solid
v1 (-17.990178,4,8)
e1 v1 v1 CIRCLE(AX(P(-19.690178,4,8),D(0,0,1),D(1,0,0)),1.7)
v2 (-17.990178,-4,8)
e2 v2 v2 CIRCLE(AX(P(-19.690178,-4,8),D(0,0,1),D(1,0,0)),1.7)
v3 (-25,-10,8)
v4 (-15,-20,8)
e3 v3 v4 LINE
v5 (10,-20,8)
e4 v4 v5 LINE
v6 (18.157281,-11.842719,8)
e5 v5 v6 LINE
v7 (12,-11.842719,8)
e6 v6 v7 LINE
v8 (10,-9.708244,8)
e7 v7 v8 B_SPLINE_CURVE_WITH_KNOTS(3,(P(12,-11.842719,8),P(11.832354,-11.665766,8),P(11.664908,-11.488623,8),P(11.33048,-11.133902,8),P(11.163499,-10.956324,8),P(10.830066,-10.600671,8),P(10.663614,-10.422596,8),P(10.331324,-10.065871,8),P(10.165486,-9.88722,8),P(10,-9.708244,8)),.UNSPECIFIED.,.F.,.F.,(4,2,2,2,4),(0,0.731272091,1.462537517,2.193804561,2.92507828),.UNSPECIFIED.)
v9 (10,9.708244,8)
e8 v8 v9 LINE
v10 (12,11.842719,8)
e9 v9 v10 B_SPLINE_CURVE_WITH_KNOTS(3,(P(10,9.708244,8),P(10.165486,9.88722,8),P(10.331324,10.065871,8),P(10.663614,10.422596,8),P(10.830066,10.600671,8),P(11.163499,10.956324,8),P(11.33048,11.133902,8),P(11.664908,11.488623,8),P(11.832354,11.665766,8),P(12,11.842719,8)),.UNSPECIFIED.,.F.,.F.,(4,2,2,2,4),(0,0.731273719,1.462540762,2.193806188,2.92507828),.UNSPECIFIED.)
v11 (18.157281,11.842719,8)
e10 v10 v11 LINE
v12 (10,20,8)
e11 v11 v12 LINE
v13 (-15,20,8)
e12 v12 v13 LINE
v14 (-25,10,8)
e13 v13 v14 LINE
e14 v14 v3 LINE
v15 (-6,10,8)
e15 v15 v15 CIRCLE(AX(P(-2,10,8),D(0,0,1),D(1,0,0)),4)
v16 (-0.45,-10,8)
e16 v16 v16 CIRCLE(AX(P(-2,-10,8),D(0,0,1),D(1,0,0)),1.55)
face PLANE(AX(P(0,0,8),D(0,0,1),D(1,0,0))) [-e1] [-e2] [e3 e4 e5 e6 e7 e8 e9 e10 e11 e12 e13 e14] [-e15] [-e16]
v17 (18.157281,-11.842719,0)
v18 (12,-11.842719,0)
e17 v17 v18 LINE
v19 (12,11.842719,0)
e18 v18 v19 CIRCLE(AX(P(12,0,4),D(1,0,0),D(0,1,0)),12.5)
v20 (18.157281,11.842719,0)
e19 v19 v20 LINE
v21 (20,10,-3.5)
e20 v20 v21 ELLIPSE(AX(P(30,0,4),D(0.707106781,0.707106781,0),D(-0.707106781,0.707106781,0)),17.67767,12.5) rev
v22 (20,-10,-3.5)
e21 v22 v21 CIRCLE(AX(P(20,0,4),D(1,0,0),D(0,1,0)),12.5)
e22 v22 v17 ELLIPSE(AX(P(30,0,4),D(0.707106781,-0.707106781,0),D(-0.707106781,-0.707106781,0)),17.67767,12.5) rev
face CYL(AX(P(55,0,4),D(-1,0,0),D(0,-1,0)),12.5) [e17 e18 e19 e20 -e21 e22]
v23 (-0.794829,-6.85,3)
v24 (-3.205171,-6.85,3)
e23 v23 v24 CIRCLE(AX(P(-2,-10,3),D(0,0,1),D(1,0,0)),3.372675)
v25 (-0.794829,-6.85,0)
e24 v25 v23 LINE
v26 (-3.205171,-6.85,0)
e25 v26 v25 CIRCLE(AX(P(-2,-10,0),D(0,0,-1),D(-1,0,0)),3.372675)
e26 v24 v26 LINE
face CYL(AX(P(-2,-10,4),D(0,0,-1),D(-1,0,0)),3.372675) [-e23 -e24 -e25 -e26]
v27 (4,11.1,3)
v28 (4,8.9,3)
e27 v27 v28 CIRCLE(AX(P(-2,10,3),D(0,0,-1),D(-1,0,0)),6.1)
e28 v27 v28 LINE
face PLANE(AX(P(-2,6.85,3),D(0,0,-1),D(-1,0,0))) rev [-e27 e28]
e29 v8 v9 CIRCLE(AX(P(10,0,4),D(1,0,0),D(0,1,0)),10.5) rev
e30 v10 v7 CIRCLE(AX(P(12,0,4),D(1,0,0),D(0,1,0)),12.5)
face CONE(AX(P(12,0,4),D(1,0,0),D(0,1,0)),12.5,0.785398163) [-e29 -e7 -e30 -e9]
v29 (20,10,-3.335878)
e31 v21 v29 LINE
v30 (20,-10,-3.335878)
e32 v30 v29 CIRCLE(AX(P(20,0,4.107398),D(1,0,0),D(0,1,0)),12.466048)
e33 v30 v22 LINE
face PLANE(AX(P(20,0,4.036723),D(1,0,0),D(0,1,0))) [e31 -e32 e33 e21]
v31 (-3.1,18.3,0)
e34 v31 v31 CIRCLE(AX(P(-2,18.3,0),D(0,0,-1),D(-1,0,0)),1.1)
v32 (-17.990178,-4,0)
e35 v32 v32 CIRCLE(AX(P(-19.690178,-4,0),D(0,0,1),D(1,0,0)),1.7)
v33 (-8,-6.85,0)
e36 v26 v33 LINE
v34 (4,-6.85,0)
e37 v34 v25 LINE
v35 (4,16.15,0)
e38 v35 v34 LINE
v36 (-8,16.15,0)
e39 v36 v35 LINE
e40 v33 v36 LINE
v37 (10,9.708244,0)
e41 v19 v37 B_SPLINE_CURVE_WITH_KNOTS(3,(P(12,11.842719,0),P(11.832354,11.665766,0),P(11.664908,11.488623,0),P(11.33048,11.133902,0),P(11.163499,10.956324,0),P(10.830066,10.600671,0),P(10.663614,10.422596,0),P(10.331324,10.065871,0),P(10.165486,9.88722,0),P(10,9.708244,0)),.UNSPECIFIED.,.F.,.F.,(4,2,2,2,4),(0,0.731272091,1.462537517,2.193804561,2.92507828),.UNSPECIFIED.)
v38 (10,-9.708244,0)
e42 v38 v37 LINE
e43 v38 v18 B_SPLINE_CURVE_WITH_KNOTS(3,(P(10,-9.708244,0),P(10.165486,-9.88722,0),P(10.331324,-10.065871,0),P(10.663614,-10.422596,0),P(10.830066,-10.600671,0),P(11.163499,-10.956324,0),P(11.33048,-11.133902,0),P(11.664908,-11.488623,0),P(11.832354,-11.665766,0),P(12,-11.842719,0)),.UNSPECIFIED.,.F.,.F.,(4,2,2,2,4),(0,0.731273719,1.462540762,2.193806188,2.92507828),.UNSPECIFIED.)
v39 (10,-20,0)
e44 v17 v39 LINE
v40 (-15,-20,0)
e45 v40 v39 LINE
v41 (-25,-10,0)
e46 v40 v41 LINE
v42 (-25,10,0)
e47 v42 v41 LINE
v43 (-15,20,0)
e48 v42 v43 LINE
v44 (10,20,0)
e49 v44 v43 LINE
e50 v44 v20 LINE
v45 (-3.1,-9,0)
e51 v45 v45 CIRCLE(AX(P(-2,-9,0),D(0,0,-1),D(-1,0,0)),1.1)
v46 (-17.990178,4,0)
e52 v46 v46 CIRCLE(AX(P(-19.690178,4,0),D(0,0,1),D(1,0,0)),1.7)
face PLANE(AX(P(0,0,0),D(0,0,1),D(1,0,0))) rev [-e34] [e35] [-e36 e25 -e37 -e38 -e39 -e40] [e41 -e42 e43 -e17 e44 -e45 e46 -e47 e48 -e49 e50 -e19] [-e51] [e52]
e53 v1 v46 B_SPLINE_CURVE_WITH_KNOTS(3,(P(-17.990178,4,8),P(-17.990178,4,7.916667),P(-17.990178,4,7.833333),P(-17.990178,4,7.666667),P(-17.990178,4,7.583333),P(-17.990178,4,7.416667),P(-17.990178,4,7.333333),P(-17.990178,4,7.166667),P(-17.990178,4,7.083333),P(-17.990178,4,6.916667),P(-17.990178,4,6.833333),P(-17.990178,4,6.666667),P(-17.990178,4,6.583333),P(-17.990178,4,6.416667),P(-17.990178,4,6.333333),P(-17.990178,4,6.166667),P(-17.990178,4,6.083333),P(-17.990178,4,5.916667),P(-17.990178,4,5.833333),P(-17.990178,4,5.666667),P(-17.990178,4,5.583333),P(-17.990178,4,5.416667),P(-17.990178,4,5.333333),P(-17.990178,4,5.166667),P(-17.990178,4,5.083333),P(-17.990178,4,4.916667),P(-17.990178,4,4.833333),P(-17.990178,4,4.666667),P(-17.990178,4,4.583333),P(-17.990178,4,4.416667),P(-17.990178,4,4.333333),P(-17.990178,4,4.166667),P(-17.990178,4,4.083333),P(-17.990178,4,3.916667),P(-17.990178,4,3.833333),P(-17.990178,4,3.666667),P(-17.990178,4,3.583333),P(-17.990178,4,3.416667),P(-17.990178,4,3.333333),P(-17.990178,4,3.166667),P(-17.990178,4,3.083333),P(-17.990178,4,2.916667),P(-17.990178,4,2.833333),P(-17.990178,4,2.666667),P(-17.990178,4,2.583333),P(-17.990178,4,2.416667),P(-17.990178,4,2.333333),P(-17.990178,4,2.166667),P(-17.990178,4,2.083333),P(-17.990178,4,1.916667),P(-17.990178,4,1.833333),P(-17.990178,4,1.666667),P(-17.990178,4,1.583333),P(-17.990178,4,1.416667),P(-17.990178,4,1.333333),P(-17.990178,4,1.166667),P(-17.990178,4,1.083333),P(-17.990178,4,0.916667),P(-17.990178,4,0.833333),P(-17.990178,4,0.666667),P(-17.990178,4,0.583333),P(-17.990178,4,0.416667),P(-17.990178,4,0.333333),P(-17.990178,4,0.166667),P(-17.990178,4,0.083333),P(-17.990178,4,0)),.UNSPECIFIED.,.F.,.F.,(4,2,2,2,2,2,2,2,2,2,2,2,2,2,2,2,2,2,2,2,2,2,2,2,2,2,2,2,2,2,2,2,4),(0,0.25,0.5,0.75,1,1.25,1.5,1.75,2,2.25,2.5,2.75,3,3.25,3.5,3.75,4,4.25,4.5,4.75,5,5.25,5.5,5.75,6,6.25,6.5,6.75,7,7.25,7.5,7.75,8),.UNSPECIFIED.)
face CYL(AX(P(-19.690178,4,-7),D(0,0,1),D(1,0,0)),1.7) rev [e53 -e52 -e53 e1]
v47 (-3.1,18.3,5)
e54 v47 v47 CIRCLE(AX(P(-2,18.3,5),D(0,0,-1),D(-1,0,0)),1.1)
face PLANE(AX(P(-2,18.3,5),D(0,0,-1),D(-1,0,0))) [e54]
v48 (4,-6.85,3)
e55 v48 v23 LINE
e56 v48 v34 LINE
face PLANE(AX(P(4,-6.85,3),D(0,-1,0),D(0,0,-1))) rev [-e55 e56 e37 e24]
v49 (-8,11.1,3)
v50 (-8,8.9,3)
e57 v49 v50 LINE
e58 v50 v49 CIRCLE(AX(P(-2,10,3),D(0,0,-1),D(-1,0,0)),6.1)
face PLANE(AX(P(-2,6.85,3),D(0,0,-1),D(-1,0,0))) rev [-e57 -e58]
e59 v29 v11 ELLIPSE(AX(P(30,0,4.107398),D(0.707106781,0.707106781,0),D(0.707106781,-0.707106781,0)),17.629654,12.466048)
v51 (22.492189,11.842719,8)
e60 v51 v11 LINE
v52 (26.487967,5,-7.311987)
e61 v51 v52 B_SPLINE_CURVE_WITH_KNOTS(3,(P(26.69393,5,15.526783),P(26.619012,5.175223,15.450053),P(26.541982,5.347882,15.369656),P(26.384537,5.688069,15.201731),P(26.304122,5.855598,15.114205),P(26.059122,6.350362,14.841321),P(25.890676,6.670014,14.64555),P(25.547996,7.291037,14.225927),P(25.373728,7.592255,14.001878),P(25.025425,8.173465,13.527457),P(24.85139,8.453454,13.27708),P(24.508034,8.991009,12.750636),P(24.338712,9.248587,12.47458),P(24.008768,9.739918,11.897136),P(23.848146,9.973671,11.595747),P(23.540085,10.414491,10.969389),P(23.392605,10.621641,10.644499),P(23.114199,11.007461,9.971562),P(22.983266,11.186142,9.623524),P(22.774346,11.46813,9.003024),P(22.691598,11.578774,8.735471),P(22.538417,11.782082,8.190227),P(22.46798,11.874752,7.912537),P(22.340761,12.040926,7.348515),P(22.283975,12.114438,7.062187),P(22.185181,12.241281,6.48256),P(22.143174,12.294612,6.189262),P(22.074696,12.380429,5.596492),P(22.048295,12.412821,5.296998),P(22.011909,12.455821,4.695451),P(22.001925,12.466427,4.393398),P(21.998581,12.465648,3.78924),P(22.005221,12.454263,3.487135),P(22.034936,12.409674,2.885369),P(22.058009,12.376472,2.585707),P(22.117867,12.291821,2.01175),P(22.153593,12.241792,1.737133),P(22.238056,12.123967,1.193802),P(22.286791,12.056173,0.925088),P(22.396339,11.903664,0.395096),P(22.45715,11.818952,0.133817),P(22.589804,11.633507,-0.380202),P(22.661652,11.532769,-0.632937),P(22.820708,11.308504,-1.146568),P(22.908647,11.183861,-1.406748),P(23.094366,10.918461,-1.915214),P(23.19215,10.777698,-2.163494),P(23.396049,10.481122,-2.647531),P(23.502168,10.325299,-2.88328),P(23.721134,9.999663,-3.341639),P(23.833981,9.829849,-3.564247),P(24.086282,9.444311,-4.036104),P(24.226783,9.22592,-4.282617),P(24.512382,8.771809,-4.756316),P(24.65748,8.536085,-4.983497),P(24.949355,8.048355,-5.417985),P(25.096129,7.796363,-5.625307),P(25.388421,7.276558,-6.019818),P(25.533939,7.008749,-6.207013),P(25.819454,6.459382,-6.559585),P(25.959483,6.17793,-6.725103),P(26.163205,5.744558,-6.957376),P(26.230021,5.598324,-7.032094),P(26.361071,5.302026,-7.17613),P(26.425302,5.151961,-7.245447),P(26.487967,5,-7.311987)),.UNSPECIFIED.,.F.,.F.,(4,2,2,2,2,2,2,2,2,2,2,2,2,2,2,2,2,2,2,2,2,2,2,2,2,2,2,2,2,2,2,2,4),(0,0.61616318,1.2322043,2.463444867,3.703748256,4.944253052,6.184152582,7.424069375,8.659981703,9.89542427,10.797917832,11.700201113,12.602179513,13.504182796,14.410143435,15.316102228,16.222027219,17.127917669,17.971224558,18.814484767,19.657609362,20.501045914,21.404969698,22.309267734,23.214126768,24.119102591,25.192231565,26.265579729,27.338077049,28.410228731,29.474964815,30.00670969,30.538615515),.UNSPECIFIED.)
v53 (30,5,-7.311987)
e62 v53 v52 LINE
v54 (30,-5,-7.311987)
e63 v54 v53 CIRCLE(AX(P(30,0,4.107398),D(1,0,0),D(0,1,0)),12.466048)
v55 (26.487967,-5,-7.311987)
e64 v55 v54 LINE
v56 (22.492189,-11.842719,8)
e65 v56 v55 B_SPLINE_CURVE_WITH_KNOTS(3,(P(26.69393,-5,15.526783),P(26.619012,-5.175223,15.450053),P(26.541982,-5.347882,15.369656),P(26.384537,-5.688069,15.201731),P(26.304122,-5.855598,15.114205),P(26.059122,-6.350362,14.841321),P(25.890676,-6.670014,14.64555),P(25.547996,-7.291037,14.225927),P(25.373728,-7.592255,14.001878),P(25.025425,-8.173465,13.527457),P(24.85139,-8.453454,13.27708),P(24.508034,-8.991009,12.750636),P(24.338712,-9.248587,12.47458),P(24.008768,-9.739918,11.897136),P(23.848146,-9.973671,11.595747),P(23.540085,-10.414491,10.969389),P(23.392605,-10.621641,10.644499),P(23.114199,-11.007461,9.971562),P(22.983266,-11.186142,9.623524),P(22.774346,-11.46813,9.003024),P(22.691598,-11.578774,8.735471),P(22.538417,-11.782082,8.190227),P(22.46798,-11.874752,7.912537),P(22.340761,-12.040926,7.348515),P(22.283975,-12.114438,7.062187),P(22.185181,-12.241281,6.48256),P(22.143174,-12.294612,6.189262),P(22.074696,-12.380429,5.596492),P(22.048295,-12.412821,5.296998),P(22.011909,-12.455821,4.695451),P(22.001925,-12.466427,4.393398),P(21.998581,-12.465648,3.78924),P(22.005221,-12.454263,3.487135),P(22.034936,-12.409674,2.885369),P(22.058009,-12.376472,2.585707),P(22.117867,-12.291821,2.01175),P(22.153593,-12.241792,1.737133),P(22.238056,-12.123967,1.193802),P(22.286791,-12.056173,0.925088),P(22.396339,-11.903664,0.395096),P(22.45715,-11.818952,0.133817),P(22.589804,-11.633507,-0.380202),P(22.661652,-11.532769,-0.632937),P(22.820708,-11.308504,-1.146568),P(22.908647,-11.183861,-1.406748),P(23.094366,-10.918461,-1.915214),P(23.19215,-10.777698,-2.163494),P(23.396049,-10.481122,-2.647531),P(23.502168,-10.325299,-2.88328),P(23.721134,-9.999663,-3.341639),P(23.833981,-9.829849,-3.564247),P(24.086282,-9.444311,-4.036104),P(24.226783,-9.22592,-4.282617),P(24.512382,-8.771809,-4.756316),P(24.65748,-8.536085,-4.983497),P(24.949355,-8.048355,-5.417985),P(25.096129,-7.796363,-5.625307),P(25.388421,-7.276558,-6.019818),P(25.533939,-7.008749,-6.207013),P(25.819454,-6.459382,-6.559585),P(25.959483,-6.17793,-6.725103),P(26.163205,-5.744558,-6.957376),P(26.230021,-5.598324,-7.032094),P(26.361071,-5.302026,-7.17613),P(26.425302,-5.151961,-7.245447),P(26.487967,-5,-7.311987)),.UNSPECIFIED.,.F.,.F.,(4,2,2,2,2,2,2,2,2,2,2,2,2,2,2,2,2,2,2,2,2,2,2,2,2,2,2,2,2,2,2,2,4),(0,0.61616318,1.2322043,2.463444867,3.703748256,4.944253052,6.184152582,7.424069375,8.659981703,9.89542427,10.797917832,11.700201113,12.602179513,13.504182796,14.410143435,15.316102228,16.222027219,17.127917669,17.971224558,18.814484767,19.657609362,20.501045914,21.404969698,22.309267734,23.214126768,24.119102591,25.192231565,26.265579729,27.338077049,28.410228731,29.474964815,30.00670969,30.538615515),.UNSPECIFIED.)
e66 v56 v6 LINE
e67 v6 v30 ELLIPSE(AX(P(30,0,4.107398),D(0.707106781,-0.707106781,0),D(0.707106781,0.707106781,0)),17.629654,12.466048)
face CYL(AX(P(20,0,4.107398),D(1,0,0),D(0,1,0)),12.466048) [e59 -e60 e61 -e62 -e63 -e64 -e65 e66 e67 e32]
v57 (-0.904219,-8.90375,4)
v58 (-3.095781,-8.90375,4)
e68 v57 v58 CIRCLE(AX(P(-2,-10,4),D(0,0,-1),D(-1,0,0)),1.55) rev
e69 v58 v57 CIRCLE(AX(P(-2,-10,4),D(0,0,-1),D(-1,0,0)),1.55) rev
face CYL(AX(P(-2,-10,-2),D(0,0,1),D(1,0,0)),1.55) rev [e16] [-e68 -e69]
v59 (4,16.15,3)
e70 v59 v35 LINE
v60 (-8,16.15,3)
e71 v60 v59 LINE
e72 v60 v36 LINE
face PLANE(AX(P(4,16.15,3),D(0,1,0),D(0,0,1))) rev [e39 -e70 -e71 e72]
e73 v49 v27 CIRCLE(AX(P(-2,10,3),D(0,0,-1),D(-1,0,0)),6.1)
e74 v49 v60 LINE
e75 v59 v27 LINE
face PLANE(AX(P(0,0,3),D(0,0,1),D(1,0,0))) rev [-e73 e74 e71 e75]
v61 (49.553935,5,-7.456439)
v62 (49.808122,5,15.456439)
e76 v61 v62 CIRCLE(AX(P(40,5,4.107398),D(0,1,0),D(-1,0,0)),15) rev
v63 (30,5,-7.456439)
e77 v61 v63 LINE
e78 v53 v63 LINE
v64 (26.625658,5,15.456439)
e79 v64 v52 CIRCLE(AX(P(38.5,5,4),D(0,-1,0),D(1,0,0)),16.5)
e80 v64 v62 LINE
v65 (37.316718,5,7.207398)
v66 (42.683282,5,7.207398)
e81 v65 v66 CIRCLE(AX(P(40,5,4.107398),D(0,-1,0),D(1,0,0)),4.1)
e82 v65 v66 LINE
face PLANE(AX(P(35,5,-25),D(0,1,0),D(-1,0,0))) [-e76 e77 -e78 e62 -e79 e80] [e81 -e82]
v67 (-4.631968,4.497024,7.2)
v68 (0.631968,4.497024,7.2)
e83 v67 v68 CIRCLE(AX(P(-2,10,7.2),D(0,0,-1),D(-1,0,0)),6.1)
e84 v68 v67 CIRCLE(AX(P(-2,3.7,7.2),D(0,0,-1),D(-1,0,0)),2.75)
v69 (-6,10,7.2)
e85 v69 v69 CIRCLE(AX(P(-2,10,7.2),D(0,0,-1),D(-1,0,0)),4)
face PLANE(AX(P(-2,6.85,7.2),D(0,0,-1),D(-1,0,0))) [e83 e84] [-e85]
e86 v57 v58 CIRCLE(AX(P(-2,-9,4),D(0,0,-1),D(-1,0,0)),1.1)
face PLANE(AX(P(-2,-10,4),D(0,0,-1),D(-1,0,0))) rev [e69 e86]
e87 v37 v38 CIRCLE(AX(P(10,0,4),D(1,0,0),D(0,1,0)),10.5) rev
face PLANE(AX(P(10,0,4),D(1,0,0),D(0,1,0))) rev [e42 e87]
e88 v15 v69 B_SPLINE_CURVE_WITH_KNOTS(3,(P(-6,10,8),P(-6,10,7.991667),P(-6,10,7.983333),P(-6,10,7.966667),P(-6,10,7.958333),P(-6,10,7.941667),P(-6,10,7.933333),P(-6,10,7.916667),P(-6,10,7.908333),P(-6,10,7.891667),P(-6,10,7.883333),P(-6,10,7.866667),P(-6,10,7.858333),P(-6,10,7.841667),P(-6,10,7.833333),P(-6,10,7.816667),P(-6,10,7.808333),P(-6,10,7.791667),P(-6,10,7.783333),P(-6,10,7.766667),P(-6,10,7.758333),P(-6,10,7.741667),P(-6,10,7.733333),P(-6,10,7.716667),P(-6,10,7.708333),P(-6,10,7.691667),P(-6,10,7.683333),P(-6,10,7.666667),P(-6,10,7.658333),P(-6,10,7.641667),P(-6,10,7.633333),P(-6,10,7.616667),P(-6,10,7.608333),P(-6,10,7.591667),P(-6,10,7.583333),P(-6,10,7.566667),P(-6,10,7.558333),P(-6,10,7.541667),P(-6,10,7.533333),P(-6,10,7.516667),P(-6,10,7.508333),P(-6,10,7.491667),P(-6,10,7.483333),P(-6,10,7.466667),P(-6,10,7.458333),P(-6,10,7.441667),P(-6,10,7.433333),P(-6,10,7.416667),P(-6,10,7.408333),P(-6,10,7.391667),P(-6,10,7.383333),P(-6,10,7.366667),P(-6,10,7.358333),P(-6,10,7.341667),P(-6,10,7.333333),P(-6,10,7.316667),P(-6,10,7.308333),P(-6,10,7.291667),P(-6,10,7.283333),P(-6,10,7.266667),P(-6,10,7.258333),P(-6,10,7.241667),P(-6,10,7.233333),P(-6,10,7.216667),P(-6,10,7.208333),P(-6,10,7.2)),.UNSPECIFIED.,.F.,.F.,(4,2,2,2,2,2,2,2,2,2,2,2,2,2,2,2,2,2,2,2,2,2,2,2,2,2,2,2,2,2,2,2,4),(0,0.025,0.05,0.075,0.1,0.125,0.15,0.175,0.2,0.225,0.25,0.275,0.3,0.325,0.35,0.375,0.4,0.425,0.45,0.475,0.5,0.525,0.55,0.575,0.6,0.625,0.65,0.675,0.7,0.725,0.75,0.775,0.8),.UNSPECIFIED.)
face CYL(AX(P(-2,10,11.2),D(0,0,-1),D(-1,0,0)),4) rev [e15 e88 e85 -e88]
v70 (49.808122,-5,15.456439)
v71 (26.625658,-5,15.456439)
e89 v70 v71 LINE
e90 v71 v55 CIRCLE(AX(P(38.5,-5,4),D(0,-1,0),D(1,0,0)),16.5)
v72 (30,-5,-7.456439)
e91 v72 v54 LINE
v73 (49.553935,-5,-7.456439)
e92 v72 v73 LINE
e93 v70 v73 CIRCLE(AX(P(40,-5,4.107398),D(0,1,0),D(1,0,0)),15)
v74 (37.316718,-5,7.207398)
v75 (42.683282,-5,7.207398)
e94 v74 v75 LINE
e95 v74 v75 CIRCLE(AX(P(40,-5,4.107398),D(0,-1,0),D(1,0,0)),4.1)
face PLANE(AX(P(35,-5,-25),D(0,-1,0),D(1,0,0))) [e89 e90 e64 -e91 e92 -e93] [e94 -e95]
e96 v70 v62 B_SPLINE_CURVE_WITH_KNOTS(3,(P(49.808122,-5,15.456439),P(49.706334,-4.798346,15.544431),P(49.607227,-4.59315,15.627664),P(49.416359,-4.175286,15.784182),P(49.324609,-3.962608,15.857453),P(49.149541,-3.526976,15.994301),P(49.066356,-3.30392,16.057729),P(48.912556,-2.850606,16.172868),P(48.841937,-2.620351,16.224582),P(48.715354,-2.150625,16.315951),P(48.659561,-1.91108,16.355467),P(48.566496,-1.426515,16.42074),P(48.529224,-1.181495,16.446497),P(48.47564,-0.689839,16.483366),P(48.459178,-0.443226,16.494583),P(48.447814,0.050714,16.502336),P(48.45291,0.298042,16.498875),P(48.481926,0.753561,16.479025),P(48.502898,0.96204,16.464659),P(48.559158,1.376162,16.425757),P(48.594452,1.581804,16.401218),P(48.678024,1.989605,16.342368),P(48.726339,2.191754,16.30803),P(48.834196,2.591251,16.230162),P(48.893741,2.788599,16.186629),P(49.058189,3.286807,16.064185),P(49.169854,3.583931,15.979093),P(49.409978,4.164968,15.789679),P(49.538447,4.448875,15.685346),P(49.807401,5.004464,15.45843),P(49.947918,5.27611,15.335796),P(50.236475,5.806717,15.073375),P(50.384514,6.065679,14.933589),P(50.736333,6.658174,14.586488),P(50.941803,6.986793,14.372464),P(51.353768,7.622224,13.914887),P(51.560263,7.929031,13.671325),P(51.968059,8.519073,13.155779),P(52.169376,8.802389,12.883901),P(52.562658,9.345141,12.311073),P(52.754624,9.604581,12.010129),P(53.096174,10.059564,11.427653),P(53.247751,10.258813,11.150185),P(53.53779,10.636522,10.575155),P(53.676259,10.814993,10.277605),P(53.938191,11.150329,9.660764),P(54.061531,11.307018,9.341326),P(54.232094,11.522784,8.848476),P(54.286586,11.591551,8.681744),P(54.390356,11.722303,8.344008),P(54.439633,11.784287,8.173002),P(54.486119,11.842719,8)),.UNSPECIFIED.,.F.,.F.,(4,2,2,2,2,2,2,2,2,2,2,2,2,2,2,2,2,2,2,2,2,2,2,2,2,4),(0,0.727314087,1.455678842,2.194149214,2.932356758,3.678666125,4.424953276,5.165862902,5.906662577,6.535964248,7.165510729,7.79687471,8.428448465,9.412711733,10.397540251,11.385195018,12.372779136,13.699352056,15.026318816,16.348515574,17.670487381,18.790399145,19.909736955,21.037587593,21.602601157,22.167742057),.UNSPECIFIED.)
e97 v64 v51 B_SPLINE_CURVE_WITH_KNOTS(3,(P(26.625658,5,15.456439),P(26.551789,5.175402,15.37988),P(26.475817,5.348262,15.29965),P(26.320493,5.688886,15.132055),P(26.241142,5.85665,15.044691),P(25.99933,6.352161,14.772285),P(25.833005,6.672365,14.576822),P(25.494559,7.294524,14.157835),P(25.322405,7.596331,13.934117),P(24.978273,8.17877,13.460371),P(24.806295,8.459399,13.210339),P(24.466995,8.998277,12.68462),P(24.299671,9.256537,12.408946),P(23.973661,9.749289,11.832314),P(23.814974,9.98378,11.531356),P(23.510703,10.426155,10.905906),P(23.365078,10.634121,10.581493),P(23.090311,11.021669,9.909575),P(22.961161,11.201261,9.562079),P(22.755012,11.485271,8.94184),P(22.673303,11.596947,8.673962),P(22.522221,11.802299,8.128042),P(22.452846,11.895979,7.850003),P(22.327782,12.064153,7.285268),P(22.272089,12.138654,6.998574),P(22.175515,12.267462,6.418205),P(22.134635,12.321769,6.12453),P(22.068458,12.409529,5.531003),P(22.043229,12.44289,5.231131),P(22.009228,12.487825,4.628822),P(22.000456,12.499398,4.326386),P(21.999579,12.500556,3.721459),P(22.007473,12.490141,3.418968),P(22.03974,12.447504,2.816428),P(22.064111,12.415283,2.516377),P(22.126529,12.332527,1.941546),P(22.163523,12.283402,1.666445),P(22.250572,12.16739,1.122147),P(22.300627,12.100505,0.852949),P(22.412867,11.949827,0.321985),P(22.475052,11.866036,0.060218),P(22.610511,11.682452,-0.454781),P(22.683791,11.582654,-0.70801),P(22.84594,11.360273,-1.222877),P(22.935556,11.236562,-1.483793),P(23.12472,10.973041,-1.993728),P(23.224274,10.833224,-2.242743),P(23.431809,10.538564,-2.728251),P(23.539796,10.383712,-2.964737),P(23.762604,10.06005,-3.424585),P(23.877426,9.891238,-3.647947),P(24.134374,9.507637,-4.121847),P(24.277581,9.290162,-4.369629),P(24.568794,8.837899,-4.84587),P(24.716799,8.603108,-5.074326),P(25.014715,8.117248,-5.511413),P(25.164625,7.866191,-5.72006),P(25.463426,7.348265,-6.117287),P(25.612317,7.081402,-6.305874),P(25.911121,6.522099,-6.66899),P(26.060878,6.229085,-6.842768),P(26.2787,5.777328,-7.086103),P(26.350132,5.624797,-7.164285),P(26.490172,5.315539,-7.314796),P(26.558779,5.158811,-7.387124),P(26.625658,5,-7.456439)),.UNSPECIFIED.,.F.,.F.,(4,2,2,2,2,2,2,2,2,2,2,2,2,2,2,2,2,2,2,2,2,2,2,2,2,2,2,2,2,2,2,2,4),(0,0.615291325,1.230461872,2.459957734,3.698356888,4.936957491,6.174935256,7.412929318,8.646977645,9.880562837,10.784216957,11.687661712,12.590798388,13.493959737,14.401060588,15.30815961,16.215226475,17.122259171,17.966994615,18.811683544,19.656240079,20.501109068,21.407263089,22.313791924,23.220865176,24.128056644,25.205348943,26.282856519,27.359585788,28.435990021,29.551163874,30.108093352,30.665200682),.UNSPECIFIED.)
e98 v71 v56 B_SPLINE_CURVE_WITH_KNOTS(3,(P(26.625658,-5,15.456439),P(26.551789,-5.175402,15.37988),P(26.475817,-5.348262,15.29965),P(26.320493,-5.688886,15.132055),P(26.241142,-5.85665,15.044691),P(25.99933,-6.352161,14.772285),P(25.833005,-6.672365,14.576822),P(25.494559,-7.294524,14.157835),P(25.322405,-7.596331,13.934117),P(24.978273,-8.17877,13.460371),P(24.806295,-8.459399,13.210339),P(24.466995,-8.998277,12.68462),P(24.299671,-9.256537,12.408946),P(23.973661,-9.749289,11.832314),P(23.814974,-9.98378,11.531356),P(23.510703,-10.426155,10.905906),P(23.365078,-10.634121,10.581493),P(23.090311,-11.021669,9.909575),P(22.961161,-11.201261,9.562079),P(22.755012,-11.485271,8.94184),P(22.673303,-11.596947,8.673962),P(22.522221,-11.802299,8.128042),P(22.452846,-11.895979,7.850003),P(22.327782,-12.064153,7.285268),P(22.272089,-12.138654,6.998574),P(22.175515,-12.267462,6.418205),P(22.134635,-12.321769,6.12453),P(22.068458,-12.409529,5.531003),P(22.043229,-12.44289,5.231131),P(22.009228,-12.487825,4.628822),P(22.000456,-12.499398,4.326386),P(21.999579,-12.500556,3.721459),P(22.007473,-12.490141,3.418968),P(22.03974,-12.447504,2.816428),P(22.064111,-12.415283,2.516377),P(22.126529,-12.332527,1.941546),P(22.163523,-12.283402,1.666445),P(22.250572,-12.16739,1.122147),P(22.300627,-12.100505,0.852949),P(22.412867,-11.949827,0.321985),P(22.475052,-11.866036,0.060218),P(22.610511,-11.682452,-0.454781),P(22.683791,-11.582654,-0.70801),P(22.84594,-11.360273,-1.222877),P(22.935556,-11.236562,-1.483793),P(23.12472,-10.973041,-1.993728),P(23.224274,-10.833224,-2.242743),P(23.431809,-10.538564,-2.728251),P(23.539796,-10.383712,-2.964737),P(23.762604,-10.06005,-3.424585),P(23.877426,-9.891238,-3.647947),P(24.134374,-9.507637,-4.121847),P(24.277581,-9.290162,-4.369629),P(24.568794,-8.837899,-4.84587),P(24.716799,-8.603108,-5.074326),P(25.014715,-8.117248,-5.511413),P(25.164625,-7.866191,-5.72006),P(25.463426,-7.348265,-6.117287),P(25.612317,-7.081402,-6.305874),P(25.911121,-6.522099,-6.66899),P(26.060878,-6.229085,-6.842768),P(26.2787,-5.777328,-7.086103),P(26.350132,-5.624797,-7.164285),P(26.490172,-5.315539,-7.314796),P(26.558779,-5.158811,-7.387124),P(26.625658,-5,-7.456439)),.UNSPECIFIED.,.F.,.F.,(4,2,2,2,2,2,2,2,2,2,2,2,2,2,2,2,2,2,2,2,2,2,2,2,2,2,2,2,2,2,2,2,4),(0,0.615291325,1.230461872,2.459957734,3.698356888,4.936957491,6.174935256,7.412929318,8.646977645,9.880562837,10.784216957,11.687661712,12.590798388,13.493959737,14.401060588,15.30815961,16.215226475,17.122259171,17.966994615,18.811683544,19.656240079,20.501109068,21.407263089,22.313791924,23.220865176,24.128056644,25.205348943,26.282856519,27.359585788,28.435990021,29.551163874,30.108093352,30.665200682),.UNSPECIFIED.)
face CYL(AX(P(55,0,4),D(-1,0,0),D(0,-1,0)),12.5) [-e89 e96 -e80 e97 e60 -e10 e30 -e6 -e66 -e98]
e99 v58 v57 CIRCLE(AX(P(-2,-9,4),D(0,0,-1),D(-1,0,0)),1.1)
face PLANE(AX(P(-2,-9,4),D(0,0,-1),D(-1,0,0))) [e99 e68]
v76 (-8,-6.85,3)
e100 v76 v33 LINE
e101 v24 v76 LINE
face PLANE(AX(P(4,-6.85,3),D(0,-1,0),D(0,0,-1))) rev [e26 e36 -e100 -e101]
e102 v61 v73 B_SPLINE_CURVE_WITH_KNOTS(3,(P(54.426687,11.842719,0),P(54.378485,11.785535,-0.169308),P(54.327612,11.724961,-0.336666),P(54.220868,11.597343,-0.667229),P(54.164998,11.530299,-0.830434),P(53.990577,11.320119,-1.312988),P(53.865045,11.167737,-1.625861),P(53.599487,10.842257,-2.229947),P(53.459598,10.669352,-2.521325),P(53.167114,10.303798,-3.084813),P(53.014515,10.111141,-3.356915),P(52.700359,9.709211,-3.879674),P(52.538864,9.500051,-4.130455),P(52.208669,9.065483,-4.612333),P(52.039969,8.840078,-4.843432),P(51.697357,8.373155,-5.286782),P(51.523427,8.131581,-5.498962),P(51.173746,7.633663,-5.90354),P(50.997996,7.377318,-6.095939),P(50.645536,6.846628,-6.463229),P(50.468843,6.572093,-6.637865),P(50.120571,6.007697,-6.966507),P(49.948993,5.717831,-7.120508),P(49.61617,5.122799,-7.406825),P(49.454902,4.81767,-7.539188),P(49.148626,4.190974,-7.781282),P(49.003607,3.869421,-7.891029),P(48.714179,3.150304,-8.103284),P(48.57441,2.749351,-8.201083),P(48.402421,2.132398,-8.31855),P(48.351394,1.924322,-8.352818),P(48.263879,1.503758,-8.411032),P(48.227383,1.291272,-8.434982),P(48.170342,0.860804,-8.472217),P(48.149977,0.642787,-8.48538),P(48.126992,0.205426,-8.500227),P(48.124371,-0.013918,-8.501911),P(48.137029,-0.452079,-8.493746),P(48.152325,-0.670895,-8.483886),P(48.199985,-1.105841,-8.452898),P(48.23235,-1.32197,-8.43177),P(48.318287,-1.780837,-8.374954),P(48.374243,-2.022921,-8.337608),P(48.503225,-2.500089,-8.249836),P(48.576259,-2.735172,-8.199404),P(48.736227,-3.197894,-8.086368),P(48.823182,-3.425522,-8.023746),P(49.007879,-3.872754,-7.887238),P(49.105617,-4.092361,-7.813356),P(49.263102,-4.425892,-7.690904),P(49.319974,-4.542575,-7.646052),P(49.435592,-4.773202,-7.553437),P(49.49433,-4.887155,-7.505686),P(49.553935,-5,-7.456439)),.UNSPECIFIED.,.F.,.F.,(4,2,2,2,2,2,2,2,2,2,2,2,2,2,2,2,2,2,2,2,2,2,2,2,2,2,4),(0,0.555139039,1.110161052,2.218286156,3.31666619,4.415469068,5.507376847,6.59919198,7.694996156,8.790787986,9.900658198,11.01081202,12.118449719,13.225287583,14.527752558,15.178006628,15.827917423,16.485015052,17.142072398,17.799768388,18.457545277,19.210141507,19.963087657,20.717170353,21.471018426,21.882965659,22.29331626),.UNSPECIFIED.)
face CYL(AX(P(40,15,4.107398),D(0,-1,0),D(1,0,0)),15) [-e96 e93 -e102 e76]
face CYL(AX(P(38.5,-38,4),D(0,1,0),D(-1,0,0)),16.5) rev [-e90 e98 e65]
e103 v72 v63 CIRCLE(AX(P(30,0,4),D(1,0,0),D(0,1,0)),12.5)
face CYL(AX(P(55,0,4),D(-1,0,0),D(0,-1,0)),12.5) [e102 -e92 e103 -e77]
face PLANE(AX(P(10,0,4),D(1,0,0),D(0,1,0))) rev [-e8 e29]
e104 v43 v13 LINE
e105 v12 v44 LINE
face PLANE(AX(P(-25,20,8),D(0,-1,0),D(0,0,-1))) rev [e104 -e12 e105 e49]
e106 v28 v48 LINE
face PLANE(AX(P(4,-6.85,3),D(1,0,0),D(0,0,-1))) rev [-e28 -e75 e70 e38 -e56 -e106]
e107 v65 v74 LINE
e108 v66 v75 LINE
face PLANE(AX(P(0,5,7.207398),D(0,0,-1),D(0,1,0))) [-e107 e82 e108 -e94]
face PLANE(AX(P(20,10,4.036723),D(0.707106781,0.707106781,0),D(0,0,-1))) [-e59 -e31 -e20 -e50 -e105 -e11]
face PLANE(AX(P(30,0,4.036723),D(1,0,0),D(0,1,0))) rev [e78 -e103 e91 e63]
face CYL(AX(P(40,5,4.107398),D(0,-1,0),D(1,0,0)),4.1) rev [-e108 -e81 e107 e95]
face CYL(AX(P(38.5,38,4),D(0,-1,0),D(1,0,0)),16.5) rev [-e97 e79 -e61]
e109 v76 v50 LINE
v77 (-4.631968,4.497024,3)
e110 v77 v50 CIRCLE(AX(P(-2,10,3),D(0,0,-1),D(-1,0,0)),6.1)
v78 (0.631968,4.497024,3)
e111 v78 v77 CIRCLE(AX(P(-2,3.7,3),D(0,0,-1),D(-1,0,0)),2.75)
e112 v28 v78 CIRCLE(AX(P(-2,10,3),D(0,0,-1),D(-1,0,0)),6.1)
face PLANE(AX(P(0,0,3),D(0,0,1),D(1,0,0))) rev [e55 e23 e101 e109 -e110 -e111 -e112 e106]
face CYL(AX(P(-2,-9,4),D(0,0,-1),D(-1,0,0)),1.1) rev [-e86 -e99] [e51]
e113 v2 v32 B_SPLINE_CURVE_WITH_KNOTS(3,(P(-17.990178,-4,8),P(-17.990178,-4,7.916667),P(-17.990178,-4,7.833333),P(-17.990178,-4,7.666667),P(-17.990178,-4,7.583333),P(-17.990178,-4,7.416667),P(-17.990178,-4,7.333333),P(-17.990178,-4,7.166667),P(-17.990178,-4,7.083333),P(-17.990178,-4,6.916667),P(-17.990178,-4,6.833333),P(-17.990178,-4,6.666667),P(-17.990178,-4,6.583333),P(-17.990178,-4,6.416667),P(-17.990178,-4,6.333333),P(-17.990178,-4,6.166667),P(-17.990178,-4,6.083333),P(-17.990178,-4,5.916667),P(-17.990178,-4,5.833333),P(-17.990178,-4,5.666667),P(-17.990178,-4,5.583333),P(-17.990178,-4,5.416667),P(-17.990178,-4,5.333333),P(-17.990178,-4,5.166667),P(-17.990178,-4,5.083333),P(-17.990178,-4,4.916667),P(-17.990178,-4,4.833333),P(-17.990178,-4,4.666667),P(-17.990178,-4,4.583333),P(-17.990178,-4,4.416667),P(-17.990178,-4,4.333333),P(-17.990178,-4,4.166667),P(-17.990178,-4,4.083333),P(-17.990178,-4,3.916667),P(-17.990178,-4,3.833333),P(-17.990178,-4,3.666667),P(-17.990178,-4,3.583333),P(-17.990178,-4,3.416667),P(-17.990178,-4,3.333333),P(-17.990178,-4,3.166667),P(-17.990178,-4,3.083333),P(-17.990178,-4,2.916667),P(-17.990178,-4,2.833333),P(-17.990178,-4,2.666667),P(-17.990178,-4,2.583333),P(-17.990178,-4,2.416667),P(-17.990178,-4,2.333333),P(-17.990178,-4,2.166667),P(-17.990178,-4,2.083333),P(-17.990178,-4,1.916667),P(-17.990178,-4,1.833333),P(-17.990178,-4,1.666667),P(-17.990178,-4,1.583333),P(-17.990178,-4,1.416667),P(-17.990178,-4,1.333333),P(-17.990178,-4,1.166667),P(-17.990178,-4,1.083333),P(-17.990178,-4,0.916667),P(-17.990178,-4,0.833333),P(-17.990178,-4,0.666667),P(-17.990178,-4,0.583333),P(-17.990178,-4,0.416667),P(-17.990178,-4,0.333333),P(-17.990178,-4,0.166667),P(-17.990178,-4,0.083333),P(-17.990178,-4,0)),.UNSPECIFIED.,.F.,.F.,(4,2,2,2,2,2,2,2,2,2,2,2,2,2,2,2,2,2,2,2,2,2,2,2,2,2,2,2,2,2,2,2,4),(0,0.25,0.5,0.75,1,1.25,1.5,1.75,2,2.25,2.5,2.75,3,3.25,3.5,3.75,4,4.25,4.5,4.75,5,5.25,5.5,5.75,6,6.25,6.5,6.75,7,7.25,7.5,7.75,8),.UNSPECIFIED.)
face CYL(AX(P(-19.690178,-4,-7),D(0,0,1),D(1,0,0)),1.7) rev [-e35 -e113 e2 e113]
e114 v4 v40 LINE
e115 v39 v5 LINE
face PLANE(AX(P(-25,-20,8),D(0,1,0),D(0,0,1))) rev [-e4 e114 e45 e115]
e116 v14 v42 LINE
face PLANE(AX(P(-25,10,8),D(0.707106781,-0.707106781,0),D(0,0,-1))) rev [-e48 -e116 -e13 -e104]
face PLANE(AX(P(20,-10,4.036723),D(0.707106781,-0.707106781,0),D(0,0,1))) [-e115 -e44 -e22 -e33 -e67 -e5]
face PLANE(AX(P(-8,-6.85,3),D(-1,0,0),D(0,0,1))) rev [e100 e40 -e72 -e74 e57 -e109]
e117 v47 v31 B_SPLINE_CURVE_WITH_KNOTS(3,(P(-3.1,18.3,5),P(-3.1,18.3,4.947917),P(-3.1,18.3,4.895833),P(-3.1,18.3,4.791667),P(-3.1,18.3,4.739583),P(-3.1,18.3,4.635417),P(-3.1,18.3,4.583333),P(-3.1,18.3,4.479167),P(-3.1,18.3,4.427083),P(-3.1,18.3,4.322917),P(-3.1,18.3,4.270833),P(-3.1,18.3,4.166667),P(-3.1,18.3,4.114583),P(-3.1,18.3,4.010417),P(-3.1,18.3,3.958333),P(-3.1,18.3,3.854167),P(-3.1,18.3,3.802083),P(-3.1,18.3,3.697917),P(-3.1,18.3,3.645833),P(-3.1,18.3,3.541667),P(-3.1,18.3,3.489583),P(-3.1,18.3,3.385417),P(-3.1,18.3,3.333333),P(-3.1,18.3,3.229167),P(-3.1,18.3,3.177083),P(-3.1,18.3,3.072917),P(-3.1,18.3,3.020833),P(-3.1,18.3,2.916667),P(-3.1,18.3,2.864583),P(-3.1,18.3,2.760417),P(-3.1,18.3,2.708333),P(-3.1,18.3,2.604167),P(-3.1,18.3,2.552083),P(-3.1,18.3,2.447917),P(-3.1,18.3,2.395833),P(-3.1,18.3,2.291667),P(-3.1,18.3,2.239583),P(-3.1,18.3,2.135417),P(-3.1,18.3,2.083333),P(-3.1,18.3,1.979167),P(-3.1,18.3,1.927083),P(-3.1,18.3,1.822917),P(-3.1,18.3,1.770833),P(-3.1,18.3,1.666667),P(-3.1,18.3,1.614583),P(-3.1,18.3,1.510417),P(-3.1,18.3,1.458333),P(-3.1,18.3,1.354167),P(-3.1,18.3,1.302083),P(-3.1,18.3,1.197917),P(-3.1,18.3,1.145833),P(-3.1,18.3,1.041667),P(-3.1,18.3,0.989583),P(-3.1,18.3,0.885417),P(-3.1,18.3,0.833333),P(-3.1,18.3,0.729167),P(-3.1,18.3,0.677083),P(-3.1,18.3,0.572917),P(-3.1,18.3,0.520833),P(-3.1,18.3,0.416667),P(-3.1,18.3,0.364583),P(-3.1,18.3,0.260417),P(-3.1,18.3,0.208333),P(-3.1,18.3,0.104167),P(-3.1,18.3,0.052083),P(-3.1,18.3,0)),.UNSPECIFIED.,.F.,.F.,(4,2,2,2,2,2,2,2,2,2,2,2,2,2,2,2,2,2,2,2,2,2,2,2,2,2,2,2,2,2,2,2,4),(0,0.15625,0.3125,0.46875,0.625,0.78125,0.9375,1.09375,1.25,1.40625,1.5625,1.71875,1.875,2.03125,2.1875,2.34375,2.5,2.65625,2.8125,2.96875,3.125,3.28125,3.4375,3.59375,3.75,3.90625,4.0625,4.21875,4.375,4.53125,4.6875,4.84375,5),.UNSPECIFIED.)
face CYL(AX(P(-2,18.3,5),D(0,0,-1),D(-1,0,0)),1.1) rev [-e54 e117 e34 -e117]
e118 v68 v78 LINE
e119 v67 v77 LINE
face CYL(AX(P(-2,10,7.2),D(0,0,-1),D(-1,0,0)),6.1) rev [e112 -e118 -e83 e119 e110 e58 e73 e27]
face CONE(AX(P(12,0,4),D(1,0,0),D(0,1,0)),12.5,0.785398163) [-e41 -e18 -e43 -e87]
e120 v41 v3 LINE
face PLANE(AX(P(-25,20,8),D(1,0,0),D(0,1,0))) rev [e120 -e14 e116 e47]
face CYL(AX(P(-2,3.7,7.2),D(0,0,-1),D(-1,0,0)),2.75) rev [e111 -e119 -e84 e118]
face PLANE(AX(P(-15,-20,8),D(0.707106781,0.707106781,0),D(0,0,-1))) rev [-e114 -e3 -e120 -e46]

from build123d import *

# Parameters (mm, degrees)
SKETCH_1_W           = 50
SKETCH_1_H           = 40
EXTRUDE_1_DEPTH      = 8
CHAMFER_1_SIZE       = 10
SKETCH_2_R           = 1.55
CUT_EXTRUDE_1_DEPTH  = 10
EXTRUDE_2_DEPTH      = 30
EXTRUDE_2_DEPTH_BACK = 15
SKETCH_3_R           = 12.5
SKETCH_4_R           = 1.7
CUT_EXTRUDE_2_DEPTH  = 15
CUT_EXTRUDE_START    = -20
CUT_EXTRUDE_3_DEPTH  = 20
SKETCH_7_R           = 16.5
CUT_EXTRUDE_8_DEPTH  = 33
CUT_EXTRUDE_9_DEPTH  = 20
CHAMFER_3_SIZE       = 2
CUT_EXTRUDE_START_2  = 20
SKETCH_10_OUTSIDE_W  = 45.574
SKETCH_10_OUTSIDE_H  = 60.574
SKETCH_10_OUTSIDE_R  = 12.466047995
CUT_EXTRUDE_10_DEPTH = 10
CHAMFER_4_SIZE       = 10
SKETCH_14_W          = 12
SKETCH_14_H          = 23
CUT_EXTRUDE_11_DEPTH = 3
CUT_EXTRUDE_12_DEPTH = 4.2
SKETCH_16_R          = 1.1
CUT_EXTRUDE_13_DEPTH = 5
SKETCH_17_R          = 3.372674955
EXTRUDE_3_DEPTH      = 4
SKETCH_18_R          = 1.1
CUT_EXTRUDE_14_DEPTH = 4
SKETCH_20_R          = 4
CUT_EXTRUDE_15_DEPTH = 4
CUT_EXTRUDE_17_DEPTH = 10


# Read off the part's stored shape, not the designer's step: 切除-拉伸3
with BuildPart() as part:
    # 草图1 → 凸台-拉伸1 (new body)
    with BuildSketch(Plane.XY):
        Rectangle(SKETCH_1_W, SKETCH_1_H)
    extrude(amount=EXTRUDE_1_DEPTH)

    # 倒角1
    chamfer_1_edges = [part.edges().sort_by_distance(p)[0] for p in [
        (-25, -20, 4),
        (-25, 20, 4),
    ]]
    chamfer(chamfer_1_edges, length=CHAMFER_1_SIZE)

    # 草图2 → 切除-拉伸1 (cut)
    with BuildSketch(Plane.XY.offset(8)):
        with Locations((-2, -10)):
            Circle(SKETCH_2_R)
        with Locations((-2, 10)):
            Circle(SKETCH_2_R)
    extrude(amount=-CUT_EXTRUDE_1_DEPTH, mode=Mode.SUBTRACT)

    # 草图3 → 凸台-拉伸2 (add, two sides: drawn at the far end of the back side and taken through both)
    with BuildSketch(Plane(origin=(25, 0, 0), x_dir=(0, 0, -1), z_dir=(1, 0, 0)).offset(-EXTRUDE_2_DEPTH_BACK)):
        with Locations(Location((-4, 0, 0), (0, 0, 251.337075115))):
            Circle(SKETCH_3_R)
    extrude(amount=EXTRUDE_2_DEPTH + EXTRUDE_2_DEPTH_BACK)

    # 草图4 → 切除-拉伸2 (cut)
    with BuildSketch(Plane.XY.offset(8)):
        with Locations((-19.690178066, -4)):
            Circle(SKETCH_4_R)
        with Locations((-19.690178066, 4)):
            Circle(SKETCH_4_R)
    extrude(amount=-CUT_EXTRUDE_2_DEPTH, mode=Mode.SUBTRACT)

    # 切除-拉伸3 outline → 切除-拉伸3 (cut)
    with BuildSketch(Plane(origin=(55, 0, 0), x_dir=(0, 0, -1), z_dir=(1, 0, 0)).offset(CUT_EXTRUDE_START)):
        with BuildLine():
            Line((7.456439237, -5), (-15.456439237, -5))
            ThreePointArc((-15.456439237, -5), (-4, -12.5), (7.456439237, -5))
        make_face()
        with BuildLine():
            ThreePointArc((7.456439237, 5), (-4, 12.5), (-15.456439237, 5))
            Line((-15.456439237, 5), (7.456439237, 5))
        make_face()
    extrude(amount=CUT_EXTRUDE_3_DEPTH, mode=Mode.SUBTRACT)

    # 草图7 → 切除-拉伸8 (cut)
    with BuildSketch(Plane.XZ.offset(5)):
        with Locations((38.5, 4)):
            Circle(SKETCH_7_R)
    cut_extrude_8 = extrude(amount=CUT_EXTRUDE_8_DEPTH, mode=Mode.SUBTRACT)

    # 镜向1: 切除-拉伸8 across plane
    add(cut_extrude_8.mirror(Plane.ZX), mode=Mode.SUBTRACT)

    # 草图8 → 切除-拉伸9 (cut)
    with BuildSketch(Plane.XZ.offset(5)):
        with BuildLine():
            Line((40, 19.107397707), (75.764252489, 33.62580965))
            Line((75.764252489, 33.62580965), (78.826270749, -18.347337912))
            Line((78.826270749, -18.347337912), (40, -10.892602293))
            ThreePointArc((40, -10.892602293), (55, 4.107397707), (40, 19.107397707))
        make_face()
    extrude(amount=-CUT_EXTRUDE_9_DEPTH, mode=Mode.SUBTRACT)

    # 倒角3
    chamfer_3_edges = [part.edges().sort_by_distance(p)[0] for p in [
        (10, 0, 16.5),
        (10, 0, -8.5),
    ]]
    chamfer(chamfer_3_edges, length=CHAMFER_3_SIZE)

    # 草图10 outside → 切除-拉伸10 (cut)
    with BuildSketch(Plane(origin=(10, 0, 0), x_dir=(0, 0, -1), z_dir=(1, 0, 0)).offset(CUT_EXTRUDE_START_2)):
        with Locations((-4, 0)):
            Rectangle(SKETCH_10_OUTSIDE_W, SKETCH_10_OUTSIDE_H)
        with Locations((-4.107397707, 0)):
            Circle(SKETCH_10_OUTSIDE_R, mode=Mode.SUBTRACT)
    extrude(amount=-CUT_EXTRUDE_10_DEPTH, mode=Mode.SUBTRACT)

    # 倒角4
    # the kernel refuses this chamfer: 10 mm, written as the material it takes off along each edge
    with BuildSketch(Plane(origin=(20, -20, -25.71682988), x_dir=(-0.9996219169112968, -0.027495876610586317, 0), z_dir=(0, 0, 1))) as chamfer_4_piece_1_section:
        Polygon((CHAMFER_4_SIZE * 0.999621916911, -CHAMFER_4_SIZE * 0.0274958766106), (-CHAMFER_4_SIZE * 0.0274958766106, -CHAMFER_4_SIZE * 0.999621916911), (0, 0), align=None)
    chamfer_4_piece_1 = extrude(amount=59.433659759, mode=Mode.PRIVATE)
    chamfer_4_piece_1 = chamfer_4_piece_1 - Plane(origin=(16.670068992, 0, 4.107397707), x_dir=(0, 0, -1), z_dir=(1, 0, 0)) * Cylinder(12.466047995, 159, mode=Mode.PRIVATE)
    add(chamfer_4_piece_1, mode=Mode.SUBTRACT)
    with BuildSketch(Plane(origin=(20, 20, 33.71682988), x_dir=(-0.9996219169112968, 0.027495876610586317, 0), z_dir=(0, 0, -1))) as chamfer_4_piece_2_section:
        Polygon((CHAMFER_4_SIZE * 0.999621916911, -CHAMFER_4_SIZE * 0.0274958766106), (-CHAMFER_4_SIZE * 0.0274958766106, -CHAMFER_4_SIZE * 0.999621916911), (0, 0), align=None)
    chamfer_4_piece_2 = extrude(amount=59.433659759, mode=Mode.PRIVATE)
    chamfer_4_piece_2 = chamfer_4_piece_2 - Plane(origin=(16.670068992, 0, 4.107397707), x_dir=(0, 0, -1), z_dir=(1, 0, 0)) * Cylinder(12.466047995, 159, mode=Mode.PRIVATE)
    add(chamfer_4_piece_2, mode=Mode.SUBTRACT)

    # 草图14 → 切除-拉伸11 (cut)
    with BuildSketch(Plane(origin=(0, 0, 0), x_dir=(-1, 0, 0), z_dir=(0, 0, -1))):
        with Locations((2, 4.65)):
            Rectangle(SKETCH_14_W, SKETCH_14_H)
    extrude(amount=-CUT_EXTRUDE_11_DEPTH, mode=Mode.SUBTRACT)

    # 草图15 → 切除-拉伸12 (cut)
    with BuildSketch(Plane(origin=(0, 0, 3), x_dir=(-1, 0, 0), z_dir=(0, 0, -1))):
        with BuildLine():
            ThreePointArc((4.631967524, 4.49702381), (2, 16.1), (-0.631967524, 4.49702381))
            ThreePointArc((-0.631967524, 4.49702381), (2, 0.95), (4.631967524, 4.49702381))
        make_face()
    extrude(amount=-CUT_EXTRUDE_12_DEPTH, mode=Mode.SUBTRACT)

    # 草图16 → 切除-拉伸13 (cut)
    with BuildSketch(Plane(origin=(0, 0, 0), x_dir=(-1, 0, 0), z_dir=(0, 0, -1))):
        with Locations((2, 18.3)):
            Circle(SKETCH_16_R)
    extrude(amount=-CUT_EXTRUDE_13_DEPTH, mode=Mode.SUBTRACT)

    # 草图17 → 凸台-拉伸3 (add)
    with BuildSketch(Plane(origin=(0, 0, 0), x_dir=(-1, 0, 0), z_dir=(0, 0, -1))):
        with Locations((2, -10)):
            Circle(SKETCH_17_R)
    extrude(amount=-EXTRUDE_3_DEPTH)

    # 草图18 → 切除-拉伸14 (cut)
    with BuildSketch(Plane(origin=(0, 0, 0), x_dir=(-1, 0, 0), z_dir=(0, 0, -1))):
        with Locations((2, -9)):
            Circle(SKETCH_18_R)
    extrude(amount=-CUT_EXTRUDE_14_DEPTH, mode=Mode.SUBTRACT)

    # 草图20 → 切除-拉伸15 (cut)
    with BuildSketch(Plane(origin=(0, 0, 7.2), x_dir=(-1, 0, 0), z_dir=(0, 0, -1))):
        with Locations((2, 10)):
            Circle(SKETCH_20_R)
    extrude(amount=-CUT_EXTRUDE_15_DEPTH, mode=Mode.SUBTRACT)

    # 草图21 → 切除-拉伸17 (cut)
    with BuildSketch(Plane.XZ.offset(5)):
        with BuildLine():
            Line((42.683281573, 7.207397707), (37.316718427, 7.207397707))
            ThreePointArc((37.316718427, 7.207397707), (38.295807295, 0.378359329), (44.1, 4.107397707))
            ThreePointArc((44.1, 4.107397707), (43.729038378, 5.811590412), (42.683281573, 7.207397707))
        make_face()
    extrude(amount=-CUT_EXTRUDE_17_DEPTH, mode=Mode.SUBTRACT)


solid = part.part
